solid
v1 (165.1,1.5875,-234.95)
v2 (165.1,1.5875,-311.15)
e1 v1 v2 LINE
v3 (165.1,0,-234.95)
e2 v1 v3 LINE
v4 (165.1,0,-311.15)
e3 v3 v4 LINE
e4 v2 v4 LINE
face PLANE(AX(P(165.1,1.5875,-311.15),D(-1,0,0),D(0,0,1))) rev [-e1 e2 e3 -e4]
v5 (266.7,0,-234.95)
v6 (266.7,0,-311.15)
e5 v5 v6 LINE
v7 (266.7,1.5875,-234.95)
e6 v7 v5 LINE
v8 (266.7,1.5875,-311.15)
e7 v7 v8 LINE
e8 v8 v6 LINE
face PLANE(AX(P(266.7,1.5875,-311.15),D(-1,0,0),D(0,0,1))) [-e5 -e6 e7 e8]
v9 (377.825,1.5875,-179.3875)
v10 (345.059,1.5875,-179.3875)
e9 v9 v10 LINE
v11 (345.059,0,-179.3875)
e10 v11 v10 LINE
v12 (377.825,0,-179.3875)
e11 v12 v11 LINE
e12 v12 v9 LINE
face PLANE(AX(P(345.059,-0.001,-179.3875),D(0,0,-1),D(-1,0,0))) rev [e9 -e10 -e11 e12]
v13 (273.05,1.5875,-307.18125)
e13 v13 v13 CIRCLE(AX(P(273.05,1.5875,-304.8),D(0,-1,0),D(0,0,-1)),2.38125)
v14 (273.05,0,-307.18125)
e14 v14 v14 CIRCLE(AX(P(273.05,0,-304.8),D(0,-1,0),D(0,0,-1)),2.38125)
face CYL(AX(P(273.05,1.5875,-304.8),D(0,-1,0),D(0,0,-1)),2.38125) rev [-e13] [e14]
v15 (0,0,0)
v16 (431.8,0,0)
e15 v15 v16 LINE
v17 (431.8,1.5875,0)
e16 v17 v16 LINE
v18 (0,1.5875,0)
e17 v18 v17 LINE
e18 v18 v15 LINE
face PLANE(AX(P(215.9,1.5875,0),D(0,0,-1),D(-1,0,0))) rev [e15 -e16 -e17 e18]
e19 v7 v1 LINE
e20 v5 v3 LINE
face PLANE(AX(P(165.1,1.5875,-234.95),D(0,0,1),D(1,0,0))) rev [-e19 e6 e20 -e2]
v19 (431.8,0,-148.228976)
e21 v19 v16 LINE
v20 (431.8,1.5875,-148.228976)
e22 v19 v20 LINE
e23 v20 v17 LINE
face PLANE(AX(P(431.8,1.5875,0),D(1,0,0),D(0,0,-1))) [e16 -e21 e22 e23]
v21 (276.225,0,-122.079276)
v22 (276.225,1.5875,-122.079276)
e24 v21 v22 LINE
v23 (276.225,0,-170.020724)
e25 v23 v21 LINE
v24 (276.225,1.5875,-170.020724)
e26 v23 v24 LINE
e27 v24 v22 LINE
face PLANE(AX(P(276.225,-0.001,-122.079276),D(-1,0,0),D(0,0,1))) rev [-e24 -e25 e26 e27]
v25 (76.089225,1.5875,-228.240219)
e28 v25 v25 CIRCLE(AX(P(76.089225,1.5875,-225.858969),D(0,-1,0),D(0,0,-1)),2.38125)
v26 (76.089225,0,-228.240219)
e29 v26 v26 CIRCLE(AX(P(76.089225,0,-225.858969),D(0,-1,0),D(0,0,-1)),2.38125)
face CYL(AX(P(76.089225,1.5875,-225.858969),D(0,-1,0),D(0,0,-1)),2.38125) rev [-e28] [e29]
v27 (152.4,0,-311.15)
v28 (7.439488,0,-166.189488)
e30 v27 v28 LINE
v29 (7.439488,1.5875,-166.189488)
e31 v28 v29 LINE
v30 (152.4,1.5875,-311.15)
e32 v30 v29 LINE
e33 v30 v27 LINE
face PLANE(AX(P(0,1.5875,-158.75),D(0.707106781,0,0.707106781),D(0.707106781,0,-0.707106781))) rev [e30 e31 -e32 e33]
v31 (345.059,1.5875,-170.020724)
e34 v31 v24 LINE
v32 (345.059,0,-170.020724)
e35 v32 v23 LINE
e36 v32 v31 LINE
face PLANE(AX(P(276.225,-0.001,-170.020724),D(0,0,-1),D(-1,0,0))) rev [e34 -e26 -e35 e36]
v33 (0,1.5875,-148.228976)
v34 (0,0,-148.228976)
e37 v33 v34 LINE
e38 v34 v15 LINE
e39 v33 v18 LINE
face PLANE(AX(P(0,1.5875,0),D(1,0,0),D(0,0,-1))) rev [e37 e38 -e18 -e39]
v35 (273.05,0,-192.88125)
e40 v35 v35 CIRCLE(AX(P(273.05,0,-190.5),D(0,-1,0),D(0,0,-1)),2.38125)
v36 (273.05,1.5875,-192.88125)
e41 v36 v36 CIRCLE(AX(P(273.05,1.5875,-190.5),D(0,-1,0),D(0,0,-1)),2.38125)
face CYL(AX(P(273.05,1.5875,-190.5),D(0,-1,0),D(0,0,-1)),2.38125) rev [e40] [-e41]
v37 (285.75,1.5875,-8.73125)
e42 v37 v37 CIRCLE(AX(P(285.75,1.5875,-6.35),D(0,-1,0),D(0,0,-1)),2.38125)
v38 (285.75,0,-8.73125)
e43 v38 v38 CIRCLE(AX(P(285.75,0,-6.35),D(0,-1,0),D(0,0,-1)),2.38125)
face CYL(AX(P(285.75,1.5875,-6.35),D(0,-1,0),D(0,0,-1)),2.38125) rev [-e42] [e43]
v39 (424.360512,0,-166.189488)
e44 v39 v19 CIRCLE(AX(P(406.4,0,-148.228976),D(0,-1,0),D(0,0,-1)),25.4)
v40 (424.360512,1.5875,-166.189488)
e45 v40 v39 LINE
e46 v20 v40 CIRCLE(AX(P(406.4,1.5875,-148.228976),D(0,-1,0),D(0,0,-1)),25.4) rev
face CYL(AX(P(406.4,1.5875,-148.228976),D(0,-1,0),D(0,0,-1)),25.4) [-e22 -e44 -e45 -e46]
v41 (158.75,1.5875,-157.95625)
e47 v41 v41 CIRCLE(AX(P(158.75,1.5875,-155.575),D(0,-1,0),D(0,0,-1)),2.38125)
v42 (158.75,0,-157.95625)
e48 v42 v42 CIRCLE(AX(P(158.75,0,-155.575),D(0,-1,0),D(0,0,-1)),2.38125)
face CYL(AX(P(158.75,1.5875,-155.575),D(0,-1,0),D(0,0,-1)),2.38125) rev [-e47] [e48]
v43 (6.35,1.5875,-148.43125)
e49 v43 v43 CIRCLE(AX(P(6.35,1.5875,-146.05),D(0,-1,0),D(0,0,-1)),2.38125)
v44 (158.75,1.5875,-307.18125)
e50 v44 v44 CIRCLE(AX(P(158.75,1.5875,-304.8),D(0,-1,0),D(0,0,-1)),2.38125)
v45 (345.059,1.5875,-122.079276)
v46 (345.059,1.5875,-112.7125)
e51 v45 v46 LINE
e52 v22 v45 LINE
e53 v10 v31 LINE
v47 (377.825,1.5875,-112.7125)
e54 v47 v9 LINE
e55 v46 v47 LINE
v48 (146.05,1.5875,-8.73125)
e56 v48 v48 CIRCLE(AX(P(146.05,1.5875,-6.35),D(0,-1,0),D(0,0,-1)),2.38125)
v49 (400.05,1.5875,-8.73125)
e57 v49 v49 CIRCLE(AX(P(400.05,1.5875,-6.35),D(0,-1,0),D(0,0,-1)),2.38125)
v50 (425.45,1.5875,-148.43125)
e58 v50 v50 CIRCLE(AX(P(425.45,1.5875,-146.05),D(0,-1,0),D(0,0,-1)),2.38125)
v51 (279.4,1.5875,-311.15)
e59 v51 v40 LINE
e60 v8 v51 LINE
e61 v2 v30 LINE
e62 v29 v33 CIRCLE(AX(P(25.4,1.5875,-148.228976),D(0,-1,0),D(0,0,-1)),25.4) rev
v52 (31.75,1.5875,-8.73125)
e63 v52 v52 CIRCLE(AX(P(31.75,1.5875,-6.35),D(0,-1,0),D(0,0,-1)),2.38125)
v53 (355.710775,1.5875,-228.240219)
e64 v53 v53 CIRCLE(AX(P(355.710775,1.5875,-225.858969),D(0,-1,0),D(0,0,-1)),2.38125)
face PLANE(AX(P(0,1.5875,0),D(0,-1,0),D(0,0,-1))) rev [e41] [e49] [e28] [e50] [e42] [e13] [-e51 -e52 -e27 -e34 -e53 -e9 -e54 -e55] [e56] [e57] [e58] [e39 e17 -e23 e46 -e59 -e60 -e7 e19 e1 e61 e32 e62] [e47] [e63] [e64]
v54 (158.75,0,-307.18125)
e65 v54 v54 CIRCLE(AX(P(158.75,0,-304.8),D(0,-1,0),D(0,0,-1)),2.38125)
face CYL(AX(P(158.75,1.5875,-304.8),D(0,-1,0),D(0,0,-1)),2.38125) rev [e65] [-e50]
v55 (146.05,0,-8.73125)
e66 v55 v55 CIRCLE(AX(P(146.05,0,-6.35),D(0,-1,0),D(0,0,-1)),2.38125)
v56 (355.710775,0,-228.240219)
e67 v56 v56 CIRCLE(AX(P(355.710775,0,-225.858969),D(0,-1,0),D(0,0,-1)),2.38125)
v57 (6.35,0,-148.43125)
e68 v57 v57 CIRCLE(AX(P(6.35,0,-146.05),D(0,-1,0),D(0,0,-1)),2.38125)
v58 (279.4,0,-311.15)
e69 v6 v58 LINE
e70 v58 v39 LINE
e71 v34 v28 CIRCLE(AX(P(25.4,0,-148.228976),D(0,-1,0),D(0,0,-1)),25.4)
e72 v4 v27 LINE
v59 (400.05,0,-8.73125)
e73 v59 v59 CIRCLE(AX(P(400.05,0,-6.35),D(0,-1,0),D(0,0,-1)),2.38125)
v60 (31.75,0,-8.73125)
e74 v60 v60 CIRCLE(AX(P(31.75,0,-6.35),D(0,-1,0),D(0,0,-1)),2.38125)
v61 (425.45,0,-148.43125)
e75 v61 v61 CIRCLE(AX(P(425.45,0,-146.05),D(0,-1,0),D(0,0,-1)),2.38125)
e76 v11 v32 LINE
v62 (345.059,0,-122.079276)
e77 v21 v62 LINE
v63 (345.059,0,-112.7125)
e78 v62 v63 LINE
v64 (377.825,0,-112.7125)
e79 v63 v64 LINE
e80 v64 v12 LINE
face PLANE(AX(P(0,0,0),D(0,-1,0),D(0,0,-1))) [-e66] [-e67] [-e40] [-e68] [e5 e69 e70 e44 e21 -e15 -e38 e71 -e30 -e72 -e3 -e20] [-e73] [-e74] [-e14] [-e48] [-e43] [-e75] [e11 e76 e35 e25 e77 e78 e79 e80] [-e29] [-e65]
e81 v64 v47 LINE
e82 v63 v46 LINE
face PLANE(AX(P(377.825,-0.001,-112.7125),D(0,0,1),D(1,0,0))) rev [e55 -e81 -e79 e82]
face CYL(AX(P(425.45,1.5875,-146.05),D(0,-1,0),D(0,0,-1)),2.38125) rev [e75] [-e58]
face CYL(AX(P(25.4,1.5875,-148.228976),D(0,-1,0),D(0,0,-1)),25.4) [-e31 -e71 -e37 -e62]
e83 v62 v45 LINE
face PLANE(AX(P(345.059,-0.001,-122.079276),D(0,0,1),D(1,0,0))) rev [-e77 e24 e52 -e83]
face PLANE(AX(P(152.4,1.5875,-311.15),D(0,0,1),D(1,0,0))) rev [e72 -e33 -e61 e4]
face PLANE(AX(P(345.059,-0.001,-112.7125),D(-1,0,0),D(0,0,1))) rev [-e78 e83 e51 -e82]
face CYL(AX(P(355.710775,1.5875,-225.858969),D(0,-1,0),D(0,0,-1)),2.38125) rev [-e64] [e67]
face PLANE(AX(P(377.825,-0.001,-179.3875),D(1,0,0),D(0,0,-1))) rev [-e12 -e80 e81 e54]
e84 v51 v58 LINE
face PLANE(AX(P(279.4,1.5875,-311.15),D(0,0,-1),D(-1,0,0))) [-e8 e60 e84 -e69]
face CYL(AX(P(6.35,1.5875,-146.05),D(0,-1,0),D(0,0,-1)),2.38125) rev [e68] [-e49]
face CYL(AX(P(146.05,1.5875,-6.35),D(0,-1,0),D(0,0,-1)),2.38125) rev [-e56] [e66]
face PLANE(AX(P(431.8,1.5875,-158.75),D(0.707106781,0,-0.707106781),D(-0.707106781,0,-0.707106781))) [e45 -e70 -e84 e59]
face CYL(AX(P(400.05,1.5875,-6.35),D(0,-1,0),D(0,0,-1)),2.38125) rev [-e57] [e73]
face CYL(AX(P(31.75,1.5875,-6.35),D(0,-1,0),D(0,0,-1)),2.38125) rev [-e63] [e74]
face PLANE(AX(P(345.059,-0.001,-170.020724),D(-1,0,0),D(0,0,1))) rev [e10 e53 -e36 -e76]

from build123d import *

# Parameters (mm, degrees)
EXTRUDE1_DEPTH     = 1.5875
MIRROR1_DEPTH      = 1.5875
CUT_EXTRUDE1_REACH = 534.229
SKETCH3_R          = 2.38125
CUT_EXTRUDE2_DEPTH = 533.229351555
FILLET1_R          = 25.4


# Read off the part's stored shape, not the designer's step: Mirror1
with BuildPart() as part:
    # Sketch1 → Extrude1 (new body)
    with BuildSketch(Plane(origin=(0, 0, 0), x_dir=(1, 0, 0), z_dir=(0, 1, 0))):
        Polygon((0, 0), (0, 158.75), (152.4, 311.15), (165.1, 311.15), (165.1, 234.95), (215.9, 234.95), (215.9, 0), align=None)
    extrude(amount=EXTRUDE1_DEPTH)

    # Mirror1 outline → Mirror1 (add)
    with BuildSketch(Plane(origin=(0, 0, 0), x_dir=(1, 0, 0), z_dir=(0, 1, 0))):
        Polygon((215.9, 0), (431.8, 0), (431.8, 158.75), (279.4, 311.15), (266.7, 311.15), (266.7, 234.95), (215.9, 234.95), align=None)
    extrude(amount=MIRROR1_DEPTH)

    # Sketch2 → Cut-Extrude1 (cut, up to next)
    with BuildSketch(Plane(origin=(0, 1.5875, 0), x_dir=(-1, 0, 0), z_dir=(0, 1, 0)), mode=Mode.PRIVATE) as cut_extrude1_sk1:
        Polygon((-276.225, -170.020724332), (-345.059, -170.020724332), (-345.059, -179.3875), (-377.825, -179.3875), (-377.825, -112.7125), (-345.059, -112.7125), (-345.059, -122.079275668), (-276.225, -122.079275668), align=None)
    cut_extrude1_tool1 = extrude(cut_extrude1_sk1.sketch, amount=-CUT_EXTRUDE1_REACH, mode=Mode.PRIVATE) & part.part
    add(cut_extrude1_tool1.solids().sort_by_distance((330.876817, 1.5875, -146.05))[0], mode=Mode.SUBTRACT)

    # Sketch3 → Cut-Extrude2 (cut, through all)
    with BuildSketch(Plane.XZ):
        with Locations(Location((400.05, -6.35, 0), (0, 0, 270))):
            Circle(SKETCH3_R)
        with Locations(Location((425.45, -146.05, 0), (0, 0, 270))):
            Circle(SKETCH3_R)
        with Locations(Location((355.710774635, -225.858969244, 0), (0, 0, 270))):
            Circle(SKETCH3_R)
        with Locations(Location((273.05, -304.8, 0), (0, 0, 270))):
            Circle(SKETCH3_R)
        with Locations(Location((273.05, -190.5, 0), (0, 0, 270))):
            Circle(SKETCH3_R)
        with Locations(Location((285.75, -6.35, 0), (0, 0, 270))):
            Circle(SKETCH3_R)
        with Locations(Location((158.75, -304.8, 0), (0, 0, 270))):
            Circle(SKETCH3_R)
        with Locations(Location((158.75, -155.575, 0), (0, 0, 270))):
            Circle(SKETCH3_R)
        with Locations(Location((146.05, -6.35, 0), (0, 0, 270))):
            Circle(SKETCH3_R)
        with Locations(Location((31.75, -6.35, 0), (0, 0, 270))):
            Circle(SKETCH3_R)
        with Locations(Location((6.35, -146.05, 0), (0, 0, 270))):
            Circle(SKETCH3_R)
        with Locations(Location((76.089225365, -225.858969244, 0), (0, 0, 270))):
            Circle(SKETCH3_R)
    extrude(amount=-CUT_EXTRUDE2_DEPTH, mode=Mode.SUBTRACT)

    # Fillet1
    fillet1_edges = [part.edges().sort_by_distance(p)[0] for p in [
        (0, 0.79375, -158.75),
        (431.8, 0.79375, -158.75),
    ]]
    fillet(fillet1_edges, radius=FILLET1_R)


solid = part.part
